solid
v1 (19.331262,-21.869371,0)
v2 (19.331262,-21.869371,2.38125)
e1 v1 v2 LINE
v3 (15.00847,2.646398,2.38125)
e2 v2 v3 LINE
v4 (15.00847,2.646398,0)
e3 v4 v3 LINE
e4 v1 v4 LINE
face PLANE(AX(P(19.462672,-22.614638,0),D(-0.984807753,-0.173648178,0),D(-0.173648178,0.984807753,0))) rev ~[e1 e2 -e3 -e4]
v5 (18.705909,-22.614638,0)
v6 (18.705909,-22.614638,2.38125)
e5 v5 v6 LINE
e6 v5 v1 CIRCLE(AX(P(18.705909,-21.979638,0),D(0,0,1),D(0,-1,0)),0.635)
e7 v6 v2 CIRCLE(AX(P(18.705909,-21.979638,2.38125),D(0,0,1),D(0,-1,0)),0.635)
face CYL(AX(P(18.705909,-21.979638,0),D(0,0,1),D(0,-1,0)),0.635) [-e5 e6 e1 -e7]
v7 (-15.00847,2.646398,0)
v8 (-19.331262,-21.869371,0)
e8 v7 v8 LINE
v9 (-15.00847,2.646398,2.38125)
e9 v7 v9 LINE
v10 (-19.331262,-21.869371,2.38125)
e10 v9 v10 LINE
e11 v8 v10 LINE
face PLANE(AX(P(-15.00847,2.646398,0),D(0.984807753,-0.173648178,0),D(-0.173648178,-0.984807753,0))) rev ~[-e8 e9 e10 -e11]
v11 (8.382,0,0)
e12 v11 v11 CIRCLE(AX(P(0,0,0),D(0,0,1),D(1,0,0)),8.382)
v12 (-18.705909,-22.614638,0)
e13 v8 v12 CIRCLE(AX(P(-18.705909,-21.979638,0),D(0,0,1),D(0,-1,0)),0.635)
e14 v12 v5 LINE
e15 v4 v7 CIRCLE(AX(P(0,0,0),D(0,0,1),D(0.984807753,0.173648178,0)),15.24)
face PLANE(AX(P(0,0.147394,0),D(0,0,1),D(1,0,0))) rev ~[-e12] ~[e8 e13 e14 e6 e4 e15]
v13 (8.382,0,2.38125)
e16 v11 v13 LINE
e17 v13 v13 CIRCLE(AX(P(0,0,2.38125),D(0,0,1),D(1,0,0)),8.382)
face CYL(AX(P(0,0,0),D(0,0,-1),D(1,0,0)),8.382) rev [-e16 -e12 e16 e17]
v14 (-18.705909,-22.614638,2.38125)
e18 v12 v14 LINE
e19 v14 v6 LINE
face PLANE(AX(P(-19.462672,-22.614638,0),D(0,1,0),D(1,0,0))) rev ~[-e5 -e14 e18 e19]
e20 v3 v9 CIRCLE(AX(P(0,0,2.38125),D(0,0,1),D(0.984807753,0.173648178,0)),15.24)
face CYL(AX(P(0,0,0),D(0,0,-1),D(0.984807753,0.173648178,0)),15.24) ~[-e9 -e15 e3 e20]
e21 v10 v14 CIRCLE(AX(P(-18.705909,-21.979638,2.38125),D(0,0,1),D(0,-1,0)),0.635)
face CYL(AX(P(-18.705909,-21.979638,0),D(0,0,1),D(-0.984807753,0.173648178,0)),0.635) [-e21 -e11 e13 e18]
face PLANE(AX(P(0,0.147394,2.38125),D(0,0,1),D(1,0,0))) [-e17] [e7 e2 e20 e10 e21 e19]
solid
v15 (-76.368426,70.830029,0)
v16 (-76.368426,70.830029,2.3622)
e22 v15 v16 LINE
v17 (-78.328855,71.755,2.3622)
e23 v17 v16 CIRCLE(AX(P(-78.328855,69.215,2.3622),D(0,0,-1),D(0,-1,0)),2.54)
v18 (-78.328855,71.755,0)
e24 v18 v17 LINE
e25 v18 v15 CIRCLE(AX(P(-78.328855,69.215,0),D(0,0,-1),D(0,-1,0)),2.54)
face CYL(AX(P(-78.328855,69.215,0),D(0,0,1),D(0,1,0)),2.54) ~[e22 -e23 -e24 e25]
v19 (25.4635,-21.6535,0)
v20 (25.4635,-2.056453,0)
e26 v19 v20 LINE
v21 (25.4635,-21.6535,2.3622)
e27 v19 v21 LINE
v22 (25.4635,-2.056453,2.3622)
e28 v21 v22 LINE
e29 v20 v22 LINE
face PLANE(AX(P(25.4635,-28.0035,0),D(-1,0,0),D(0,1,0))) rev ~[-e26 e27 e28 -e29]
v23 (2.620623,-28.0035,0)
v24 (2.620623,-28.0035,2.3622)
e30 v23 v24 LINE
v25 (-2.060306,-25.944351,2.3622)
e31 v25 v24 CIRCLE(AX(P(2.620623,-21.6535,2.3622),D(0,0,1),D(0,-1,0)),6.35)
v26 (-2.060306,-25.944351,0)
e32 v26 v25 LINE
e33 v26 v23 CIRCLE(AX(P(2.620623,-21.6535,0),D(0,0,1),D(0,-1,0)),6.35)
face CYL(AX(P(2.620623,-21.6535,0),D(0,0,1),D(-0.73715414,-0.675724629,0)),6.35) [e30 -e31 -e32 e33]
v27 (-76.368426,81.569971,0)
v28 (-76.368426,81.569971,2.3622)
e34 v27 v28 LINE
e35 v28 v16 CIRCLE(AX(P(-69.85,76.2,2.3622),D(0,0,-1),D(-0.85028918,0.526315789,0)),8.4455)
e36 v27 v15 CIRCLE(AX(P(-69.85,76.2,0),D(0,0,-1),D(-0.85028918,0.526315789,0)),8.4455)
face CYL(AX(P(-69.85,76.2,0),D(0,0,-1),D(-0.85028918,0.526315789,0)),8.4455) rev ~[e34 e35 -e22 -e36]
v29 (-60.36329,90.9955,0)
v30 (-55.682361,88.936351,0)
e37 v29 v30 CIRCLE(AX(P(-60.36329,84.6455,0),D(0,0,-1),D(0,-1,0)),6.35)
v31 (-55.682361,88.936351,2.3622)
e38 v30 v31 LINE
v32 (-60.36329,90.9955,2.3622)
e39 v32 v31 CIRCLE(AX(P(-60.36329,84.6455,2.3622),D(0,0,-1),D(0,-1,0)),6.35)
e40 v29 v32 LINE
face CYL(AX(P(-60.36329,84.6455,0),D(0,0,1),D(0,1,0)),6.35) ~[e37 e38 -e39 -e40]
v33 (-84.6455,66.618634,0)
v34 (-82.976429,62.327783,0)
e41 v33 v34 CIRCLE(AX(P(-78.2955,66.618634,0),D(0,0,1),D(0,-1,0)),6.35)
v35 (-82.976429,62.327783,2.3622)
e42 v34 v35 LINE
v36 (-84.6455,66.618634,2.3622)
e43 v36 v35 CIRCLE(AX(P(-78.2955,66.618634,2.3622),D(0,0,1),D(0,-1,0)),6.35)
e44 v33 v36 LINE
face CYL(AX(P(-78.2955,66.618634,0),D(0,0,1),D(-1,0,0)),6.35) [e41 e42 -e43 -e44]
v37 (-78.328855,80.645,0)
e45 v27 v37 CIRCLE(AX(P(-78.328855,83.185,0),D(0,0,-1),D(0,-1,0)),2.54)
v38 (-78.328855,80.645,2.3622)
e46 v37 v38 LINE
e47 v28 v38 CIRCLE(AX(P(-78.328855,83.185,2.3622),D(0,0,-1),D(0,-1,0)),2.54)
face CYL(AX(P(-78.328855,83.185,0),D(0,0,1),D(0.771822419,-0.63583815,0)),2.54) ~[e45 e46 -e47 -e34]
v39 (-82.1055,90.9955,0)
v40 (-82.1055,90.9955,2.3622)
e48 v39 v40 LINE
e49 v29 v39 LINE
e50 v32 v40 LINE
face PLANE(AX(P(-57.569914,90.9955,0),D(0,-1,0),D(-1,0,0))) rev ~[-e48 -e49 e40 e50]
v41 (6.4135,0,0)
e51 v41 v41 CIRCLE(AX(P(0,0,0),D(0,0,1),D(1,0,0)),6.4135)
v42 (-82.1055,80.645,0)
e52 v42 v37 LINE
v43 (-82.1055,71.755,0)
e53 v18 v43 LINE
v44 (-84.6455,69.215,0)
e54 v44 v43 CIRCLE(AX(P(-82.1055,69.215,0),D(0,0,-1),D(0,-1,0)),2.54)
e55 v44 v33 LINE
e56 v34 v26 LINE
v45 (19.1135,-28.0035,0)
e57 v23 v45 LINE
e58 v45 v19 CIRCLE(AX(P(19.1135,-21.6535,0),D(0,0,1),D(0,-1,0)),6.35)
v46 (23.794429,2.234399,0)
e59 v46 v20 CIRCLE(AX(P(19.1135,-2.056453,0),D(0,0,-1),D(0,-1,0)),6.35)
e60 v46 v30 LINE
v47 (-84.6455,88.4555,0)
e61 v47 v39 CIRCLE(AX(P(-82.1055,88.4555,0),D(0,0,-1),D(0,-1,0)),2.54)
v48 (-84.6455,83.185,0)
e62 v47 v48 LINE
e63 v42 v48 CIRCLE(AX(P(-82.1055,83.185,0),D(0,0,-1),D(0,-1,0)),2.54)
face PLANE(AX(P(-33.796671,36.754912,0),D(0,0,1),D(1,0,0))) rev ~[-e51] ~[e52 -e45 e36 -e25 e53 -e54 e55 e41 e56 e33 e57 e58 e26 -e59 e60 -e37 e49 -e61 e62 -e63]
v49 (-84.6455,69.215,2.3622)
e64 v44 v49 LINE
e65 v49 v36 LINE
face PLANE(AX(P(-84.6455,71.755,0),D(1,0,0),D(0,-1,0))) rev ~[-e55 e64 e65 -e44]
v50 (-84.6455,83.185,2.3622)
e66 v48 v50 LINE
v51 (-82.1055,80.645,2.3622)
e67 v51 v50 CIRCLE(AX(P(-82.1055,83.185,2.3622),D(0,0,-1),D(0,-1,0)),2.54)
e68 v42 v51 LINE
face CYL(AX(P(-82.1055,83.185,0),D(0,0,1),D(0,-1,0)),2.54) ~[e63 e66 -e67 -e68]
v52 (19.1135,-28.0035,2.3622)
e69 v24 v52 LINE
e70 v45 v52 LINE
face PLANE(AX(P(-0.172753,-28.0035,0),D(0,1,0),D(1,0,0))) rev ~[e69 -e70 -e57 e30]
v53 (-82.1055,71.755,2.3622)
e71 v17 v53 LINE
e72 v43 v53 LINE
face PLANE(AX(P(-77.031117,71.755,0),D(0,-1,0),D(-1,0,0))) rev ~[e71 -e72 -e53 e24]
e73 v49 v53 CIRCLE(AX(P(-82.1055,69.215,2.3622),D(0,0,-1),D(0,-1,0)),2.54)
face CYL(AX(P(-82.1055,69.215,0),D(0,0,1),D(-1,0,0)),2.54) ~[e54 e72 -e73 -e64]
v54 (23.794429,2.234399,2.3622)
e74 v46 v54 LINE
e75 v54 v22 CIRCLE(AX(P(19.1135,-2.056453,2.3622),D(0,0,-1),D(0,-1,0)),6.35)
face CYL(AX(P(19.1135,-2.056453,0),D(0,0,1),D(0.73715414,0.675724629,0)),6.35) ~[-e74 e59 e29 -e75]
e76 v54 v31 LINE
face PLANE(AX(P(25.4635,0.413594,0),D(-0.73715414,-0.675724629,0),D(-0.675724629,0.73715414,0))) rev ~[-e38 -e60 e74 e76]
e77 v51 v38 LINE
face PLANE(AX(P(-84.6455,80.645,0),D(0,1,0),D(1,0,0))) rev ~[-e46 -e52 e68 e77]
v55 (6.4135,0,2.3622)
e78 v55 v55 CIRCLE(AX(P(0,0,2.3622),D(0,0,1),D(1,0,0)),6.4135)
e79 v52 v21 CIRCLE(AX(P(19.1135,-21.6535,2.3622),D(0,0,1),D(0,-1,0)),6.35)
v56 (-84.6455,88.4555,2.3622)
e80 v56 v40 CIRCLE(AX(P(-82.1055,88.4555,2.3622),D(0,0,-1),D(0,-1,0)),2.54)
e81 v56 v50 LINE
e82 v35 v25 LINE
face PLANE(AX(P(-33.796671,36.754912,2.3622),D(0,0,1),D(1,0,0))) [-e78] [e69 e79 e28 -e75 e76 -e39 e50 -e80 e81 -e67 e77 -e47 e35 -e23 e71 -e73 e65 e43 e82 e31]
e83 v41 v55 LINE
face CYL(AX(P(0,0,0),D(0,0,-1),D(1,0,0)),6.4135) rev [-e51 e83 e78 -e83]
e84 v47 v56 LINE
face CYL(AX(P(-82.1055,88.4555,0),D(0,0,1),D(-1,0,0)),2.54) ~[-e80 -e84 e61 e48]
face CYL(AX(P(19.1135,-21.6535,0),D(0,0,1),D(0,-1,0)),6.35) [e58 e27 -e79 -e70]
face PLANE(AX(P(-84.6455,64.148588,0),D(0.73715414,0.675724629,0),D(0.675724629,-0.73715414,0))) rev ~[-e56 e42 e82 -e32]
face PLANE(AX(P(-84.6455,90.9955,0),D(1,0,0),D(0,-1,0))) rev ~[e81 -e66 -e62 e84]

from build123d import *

# Parameters (mm, degrees)
F0_R     = 8.382
F1_DEPTH = 2.38125
F2_R     = 0.635
F3_R     = 6.4135
F4_DEPTH = 2.3622
F5_R     = 6.35
F6_R     = 2.54


# Not quite as in the source:
# - a feature names something its author has since deleted; it is built from what else it names


with BuildPart() as f1:
    # F0 (on Top) → F1 (new body)
    with BuildSketch(Plane.XY):
        with BuildLine():
            ThreePointArc((-15.24, 0), (0, -15.24), (15.24, 0))
            ThreePointArc((15.24, 0), (15.1820071989, 1.3282535195), (15.0084701559, 2.6463982276))
            ThreePointArc((15.0084701559, 2.6463982276), (0, 15.24), (-15.0084701559, 2.6463982276))
            ThreePointArc((-15.0084701559, 2.6463982276), (-15.1820071989, 1.3282535195), (-15.24, 0))
        make_face()
        Circle(F0_R, mode=Mode.SUBTRACT)
        with BuildLine():
            ThreePointArc((15.0084701559, 2.6463982276), (15.1820071989, 1.3282535195), (15.24, 0))
            ThreePointArc((15.24, 0), (0, -15.24), (-15.24, 0))
            ThreePointArc((-15.24, 0), (-15.1820071989, 1.3282535195), (-15.0084701559, 2.6463982276))
            Line((-15.0084701559, 2.6463982276), (-19.4626723496, -22.6146376946))
            ThreePointArc((-19.4626723496, -22.6146376946), (0, -17.78), (19.4626723496, -22.6146376946))
            Line((19.4626723496, -22.6146376946), (15.0084701559, 2.6463982276))
        make_face()
        with BuildLine():
            Line((-19.4626723496, -22.6146376946), (19.4626723496, -22.6146376946))
            ThreePointArc((19.4626723496, -22.6146376946), (0, -17.78), (-19.4626723496, -22.6146376946))
        make_face()
    extrude(amount=F1_DEPTH)

    # F2
    f2_edges = [f1.edges().sort_by_distance(p)[0] for p in [
        (-19.462672, -22.614638, 1.190625),
        (19.462672, -22.614638, 1.190625),
    ]]
    fillet(f2_edges, radius=F2_R)


with BuildPart() as f4:
    # F3 (on Top) → F4 (new body)
    with BuildSketch(Plane.XY):
        with BuildLine():
            ThreePointArc((-77.0311172703, 80.645), (-61.4045, 76.2), (-77.0311172703, 71.755))
            Line((-77.0311172703, 71.755), (-84.6455, 71.755))
            Line((-84.6455, 71.755), (-84.6455, 64.1485879677))
            Line((-84.6455, 64.1485879677), (-0.1727526963, -28.0035))
            Line((-0.1727526963, -28.0035), (25.4635, -28.0035))
            Line((25.4635, -28.0035), (25.4635, 0.4135938505))
            Line((25.4635, 0.4135938505), (-57.5699139704, 90.9955))
            Line((-57.5699139704, 90.9955), (-84.6455, 90.9955))
            Line((-84.6455, 90.9955), (-84.6455, 80.645))
            Line((-84.6455, 80.645), (-77.0311172703, 80.645))
        make_face()
        Circle(F3_R, mode=Mode.SUBTRACT)
    extrude(amount=F4_DEPTH)

    # F5
    f5_edges = [f4.edges().sort_by_distance(p)[0] for p in [
        (-57.569914, 90.9955, 1.1811),
        (25.4635, 0.413594, 1.1811),
        (25.4635, -28.0035, 1.1811),
        (-0.172753, -28.0035, 1.1811),
        (-84.6455, 64.148588, 1.1811),
    ]]
    fillet(f5_edges, radius=F5_R)

    # F6
    f6_edges = [f4.edges().sort_by_distance(p)[0] for p in [
        (-84.6455, 80.645, 1.1811),
        (-84.6455, 71.755, 1.1811),
        (-84.6455, 90.9955, 1.1811),
        (-77.031117, 80.645, 1.1811),
        (-77.031117, 71.755, 1.1811),
    ]]
    fillet(f6_edges, radius=F6_R)


solid = Compound([f1.part, f4.part])
